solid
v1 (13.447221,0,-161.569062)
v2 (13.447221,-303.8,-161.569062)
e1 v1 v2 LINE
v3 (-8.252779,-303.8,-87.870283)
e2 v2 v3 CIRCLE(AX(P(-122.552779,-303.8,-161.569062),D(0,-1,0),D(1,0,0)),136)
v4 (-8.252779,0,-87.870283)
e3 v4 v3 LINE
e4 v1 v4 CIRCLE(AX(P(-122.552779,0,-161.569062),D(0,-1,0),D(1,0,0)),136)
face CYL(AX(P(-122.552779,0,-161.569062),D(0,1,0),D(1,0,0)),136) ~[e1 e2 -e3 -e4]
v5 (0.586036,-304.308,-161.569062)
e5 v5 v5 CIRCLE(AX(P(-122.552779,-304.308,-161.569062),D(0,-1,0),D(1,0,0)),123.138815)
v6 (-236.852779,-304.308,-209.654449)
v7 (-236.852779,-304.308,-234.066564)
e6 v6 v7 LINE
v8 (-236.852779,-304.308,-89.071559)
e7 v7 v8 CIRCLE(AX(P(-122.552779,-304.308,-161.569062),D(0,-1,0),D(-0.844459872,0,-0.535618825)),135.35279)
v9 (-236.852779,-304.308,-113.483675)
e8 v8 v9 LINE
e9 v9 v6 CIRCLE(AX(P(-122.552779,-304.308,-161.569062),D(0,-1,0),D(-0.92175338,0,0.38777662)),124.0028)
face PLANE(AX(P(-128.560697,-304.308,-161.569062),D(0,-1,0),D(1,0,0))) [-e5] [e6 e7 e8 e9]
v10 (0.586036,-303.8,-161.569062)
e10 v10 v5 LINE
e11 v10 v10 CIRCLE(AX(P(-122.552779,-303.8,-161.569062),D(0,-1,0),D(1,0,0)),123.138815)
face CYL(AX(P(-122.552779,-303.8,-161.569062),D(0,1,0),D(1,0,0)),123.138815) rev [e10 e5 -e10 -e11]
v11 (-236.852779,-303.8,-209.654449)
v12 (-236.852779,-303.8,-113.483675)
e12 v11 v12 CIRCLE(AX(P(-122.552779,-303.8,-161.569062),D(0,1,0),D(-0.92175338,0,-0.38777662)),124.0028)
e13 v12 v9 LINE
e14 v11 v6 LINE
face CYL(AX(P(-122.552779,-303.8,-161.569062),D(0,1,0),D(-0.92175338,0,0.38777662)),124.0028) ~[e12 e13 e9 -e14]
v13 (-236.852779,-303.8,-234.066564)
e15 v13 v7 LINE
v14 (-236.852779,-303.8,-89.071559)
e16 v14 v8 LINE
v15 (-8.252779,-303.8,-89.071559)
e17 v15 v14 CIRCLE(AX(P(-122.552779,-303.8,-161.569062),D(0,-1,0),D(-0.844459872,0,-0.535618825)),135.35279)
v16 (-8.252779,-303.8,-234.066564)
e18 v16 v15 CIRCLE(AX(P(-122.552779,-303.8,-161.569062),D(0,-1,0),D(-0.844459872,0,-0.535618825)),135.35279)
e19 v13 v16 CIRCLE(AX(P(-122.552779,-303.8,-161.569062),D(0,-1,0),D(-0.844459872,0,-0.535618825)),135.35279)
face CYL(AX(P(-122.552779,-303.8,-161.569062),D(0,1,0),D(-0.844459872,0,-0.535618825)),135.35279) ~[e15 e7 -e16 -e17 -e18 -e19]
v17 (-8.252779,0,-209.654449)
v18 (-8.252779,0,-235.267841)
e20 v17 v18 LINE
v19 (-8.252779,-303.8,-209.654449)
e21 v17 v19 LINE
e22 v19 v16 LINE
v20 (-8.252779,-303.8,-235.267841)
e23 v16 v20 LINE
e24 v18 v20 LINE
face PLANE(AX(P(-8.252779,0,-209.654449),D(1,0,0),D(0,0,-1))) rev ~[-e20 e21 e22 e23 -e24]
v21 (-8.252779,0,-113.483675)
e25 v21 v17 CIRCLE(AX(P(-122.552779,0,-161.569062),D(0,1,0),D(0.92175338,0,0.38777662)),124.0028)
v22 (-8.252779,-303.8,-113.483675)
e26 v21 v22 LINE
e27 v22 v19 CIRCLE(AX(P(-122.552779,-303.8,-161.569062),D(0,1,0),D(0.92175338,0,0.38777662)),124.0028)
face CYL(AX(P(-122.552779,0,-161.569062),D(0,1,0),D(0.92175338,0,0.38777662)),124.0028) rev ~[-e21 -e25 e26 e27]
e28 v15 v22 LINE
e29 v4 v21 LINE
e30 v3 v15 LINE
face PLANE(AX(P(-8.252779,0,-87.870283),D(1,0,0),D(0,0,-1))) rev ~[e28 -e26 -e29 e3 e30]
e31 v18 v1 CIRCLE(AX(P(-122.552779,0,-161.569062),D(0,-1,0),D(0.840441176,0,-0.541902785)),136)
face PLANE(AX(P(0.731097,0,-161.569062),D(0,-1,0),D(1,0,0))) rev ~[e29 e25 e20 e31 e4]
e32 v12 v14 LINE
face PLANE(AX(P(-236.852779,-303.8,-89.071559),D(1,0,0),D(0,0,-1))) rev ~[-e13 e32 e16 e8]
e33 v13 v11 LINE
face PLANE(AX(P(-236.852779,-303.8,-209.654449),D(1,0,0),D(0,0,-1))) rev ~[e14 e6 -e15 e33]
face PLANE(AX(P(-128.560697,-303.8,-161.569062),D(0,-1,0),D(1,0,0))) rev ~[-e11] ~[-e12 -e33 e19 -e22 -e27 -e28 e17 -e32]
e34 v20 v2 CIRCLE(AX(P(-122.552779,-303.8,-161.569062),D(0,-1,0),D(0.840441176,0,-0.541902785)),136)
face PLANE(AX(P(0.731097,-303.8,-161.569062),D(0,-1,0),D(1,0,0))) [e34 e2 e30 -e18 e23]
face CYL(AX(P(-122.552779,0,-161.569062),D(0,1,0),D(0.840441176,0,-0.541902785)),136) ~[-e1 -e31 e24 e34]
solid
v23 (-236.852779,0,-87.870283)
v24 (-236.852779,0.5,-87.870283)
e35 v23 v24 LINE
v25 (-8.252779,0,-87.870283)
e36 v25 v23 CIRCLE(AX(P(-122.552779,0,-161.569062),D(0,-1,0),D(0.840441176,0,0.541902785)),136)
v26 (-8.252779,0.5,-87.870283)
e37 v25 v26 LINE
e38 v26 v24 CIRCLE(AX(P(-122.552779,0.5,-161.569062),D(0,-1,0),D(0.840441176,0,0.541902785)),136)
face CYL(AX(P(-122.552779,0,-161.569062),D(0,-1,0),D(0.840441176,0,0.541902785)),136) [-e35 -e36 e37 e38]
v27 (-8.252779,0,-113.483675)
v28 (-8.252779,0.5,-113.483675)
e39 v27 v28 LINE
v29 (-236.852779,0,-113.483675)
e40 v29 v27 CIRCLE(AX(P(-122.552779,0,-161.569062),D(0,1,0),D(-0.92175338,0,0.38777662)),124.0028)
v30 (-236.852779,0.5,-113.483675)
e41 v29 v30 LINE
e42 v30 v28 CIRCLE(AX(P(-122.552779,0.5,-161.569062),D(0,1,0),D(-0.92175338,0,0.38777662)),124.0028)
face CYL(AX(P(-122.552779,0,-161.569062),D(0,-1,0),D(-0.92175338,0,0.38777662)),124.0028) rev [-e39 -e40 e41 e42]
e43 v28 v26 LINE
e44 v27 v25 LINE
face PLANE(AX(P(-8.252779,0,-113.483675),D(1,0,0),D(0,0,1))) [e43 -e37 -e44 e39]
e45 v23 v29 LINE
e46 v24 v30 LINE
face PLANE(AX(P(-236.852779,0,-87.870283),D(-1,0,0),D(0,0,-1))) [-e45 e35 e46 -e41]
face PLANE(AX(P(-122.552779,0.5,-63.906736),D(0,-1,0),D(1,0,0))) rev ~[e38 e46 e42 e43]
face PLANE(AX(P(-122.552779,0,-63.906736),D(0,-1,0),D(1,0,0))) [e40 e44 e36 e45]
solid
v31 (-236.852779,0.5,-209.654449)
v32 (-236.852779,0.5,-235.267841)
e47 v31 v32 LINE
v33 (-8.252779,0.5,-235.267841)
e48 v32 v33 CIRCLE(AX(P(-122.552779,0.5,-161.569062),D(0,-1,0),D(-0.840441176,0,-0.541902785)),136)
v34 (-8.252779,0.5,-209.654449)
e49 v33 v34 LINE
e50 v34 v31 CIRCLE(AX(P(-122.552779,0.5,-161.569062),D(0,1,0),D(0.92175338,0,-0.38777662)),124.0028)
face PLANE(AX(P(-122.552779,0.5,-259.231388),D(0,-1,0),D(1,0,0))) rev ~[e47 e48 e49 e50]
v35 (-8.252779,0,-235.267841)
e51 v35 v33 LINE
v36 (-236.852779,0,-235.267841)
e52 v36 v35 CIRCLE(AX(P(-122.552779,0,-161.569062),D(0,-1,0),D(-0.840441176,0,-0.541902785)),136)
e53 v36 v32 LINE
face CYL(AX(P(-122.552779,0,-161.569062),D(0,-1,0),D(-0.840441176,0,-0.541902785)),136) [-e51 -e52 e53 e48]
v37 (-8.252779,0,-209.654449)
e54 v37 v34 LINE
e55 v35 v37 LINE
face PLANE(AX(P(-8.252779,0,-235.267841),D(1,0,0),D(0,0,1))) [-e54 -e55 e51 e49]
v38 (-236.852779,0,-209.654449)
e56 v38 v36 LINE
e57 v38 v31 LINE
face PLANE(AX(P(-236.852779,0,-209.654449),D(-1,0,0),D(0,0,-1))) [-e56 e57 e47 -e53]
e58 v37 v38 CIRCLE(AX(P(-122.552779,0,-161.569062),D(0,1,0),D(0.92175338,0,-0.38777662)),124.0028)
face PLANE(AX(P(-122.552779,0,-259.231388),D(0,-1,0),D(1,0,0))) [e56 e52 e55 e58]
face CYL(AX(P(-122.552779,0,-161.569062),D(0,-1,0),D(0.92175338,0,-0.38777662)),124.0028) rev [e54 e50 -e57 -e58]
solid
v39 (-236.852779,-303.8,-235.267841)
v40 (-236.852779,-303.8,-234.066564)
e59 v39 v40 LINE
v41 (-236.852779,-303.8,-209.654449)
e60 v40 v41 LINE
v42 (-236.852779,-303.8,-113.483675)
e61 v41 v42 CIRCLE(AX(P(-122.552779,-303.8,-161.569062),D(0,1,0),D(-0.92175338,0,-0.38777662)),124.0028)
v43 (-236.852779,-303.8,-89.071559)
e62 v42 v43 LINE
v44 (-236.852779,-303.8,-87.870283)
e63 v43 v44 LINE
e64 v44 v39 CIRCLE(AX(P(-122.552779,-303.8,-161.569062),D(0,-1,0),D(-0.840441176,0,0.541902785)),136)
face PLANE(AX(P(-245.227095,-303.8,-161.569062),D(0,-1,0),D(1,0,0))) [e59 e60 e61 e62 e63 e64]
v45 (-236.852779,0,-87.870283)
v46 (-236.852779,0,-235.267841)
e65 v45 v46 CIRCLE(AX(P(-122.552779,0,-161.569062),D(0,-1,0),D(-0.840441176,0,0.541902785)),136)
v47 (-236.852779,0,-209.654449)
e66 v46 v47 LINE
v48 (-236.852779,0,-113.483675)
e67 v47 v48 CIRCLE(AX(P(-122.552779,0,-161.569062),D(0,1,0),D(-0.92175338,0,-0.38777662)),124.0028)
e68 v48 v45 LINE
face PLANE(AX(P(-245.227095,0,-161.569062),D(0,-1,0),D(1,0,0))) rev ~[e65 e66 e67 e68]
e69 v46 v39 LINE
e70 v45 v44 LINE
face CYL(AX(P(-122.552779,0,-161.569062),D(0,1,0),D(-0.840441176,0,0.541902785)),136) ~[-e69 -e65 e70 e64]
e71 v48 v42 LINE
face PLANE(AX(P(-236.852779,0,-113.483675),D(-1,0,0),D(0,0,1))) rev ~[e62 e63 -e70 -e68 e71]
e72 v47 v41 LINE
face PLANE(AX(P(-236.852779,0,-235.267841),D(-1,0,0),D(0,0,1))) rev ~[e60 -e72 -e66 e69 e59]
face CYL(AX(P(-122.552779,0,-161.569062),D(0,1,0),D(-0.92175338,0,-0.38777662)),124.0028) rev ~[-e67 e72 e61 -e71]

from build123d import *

# Parameters (mm, degrees)
F1_DEPTH = 303.8
F2_DEPTH = 0.5
F3_R     = 123.138814649
F4_DEPTH = 0.508


# Not quite as in the source:
# - ends of sketch curves that miss each other by under 0.0002 mm in the source are joined


with BuildPart() as f1:
    # F0 (on Front) → F1 (new body)
    with BuildSketch(Plane.XZ):
        with BuildLine():
            Line((-236.8527790219, -113.4836752775), (-236.8527790219, -87.8702830895))
            ThreePointArc((-236.8527790219, -87.8702830895), (-258.5527790219, -161.5690619125), (-236.8527790219, -235.2678407355))
            Line((-236.8527790219, -235.2678407355), (-236.8527790219, -209.6544485476))
            ThreePointArc((-236.8527790219, -209.6544485476), (-246.5555790219, -161.5690619125), (-236.8527790219, -113.4836752775))
        make_face()
    extrude(amount=F1_DEPTH)



with BuildPart() as f1b:
    # F0 (on Front) → F1, piece 2 (new body)
    with BuildSketch(Plane.XZ):
        with BuildLine():
            ThreePointArc((-8.2527790219, -235.2678407355), (7.909476056, -199.9826011923), (13.4472209781, -161.5690619125))
            ThreePointArc((13.4472209781, -161.5690619125), (7.909476056, -123.1555226327), (-8.2527790219, -87.8702830895))
            Line((-8.2527790219, -87.8702830895), (-8.2527790219, -113.4836752775))
            ThreePointArc((-8.2527790219, -113.4836752775), (-0.999880151, -137.0417876261), (1.4500209781, -161.5690619125))
            ThreePointArc((1.4500209781, -161.5690619125), (-0.999880151, -186.0963361989), (-8.2527790219, -209.6544485476))
            Line((-8.2527790219, -209.6544485476), (-8.2527790219, -235.2678407355))
        make_face()
    extrude(amount=F1_DEPTH)


with BuildPart() as f2:
    # F0 (on Front) → F2 (new body)
    with BuildSketch(Plane.XZ):
        with BuildLine():
            Line((-8.2527790219, -113.4836752775), (-8.2527790219, -87.8702830895))
            ThreePointArc((-8.2527790219, -87.8702830895), (-122.5528719649, -25.5690619126), (-236.8527790219, -87.8702830895))
            Line((-236.8527790219, -87.8702830895), (-236.8527790219, -113.4836752775))
            ThreePointArc((-236.8527790219, -113.4836752775), (-122.5527790219, -37.5662619125), (-8.2527790219, -113.4836752775))
        make_face()
    extrude(amount=-F2_DEPTH)


with BuildPart() as f2b:
    # F0 (on Front) → F2, piece 2 (new body)
    with BuildSketch(Plane.XZ):
        with BuildLine():
            ThreePointArc((-236.8527790219, -235.2678407355), (-122.5527790219, -297.5690619125), (-8.2527790219, -235.2678407355))
            Line((-8.2527790219, -235.2678407355), (-8.2527790219, -209.6544485476))
            ThreePointArc((-8.2527790219, -209.6544485476), (-122.5527790219, -285.5718619125), (-236.8527790219, -209.6544485476))
            Line((-236.8527790219, -209.6544485476), (-236.8527790219, -235.2678407355))
        make_face()
    extrude(amount=-F2_DEPTH)


with BuildPart() as f1_1:
    add(f1.part)

    add(f1b.part)  # F4 merges F1b
    # F3 (on face) → F4 (join)
    with BuildSketch(Plane.XZ.offset(303.8)):
        with BuildLine():
            ThreePointArc((-236.8527790219, -234.0665643946), (-84.8065611673, -291.5521412106), (12.8000113673, -161.5690619125))
            ThreePointArc((12.8000113673, -161.5690619125), (-84.8065611673, -31.5859826145), (-236.8527790219, -89.0715594305))
            Line((-236.8527790219, -89.0715594305), (-236.8527790219, -113.4836752775))
            ThreePointArc((-236.8527790219, -113.4836752775), (-246.5555790219, -161.5690619125), (-236.8527790219, -209.6544485476))
            Line((-236.8527790219, -209.6544485476), (-236.8527790219, -234.0665643946))
        make_face()
        with Locations((-122.5527790219, -161.5690619125)):
            Circle(F3_R, mode=Mode.SUBTRACT)
    extrude(amount=F4_DEPTH)


solid = Compound([f2.part, f2b.part, f1_1.part])
